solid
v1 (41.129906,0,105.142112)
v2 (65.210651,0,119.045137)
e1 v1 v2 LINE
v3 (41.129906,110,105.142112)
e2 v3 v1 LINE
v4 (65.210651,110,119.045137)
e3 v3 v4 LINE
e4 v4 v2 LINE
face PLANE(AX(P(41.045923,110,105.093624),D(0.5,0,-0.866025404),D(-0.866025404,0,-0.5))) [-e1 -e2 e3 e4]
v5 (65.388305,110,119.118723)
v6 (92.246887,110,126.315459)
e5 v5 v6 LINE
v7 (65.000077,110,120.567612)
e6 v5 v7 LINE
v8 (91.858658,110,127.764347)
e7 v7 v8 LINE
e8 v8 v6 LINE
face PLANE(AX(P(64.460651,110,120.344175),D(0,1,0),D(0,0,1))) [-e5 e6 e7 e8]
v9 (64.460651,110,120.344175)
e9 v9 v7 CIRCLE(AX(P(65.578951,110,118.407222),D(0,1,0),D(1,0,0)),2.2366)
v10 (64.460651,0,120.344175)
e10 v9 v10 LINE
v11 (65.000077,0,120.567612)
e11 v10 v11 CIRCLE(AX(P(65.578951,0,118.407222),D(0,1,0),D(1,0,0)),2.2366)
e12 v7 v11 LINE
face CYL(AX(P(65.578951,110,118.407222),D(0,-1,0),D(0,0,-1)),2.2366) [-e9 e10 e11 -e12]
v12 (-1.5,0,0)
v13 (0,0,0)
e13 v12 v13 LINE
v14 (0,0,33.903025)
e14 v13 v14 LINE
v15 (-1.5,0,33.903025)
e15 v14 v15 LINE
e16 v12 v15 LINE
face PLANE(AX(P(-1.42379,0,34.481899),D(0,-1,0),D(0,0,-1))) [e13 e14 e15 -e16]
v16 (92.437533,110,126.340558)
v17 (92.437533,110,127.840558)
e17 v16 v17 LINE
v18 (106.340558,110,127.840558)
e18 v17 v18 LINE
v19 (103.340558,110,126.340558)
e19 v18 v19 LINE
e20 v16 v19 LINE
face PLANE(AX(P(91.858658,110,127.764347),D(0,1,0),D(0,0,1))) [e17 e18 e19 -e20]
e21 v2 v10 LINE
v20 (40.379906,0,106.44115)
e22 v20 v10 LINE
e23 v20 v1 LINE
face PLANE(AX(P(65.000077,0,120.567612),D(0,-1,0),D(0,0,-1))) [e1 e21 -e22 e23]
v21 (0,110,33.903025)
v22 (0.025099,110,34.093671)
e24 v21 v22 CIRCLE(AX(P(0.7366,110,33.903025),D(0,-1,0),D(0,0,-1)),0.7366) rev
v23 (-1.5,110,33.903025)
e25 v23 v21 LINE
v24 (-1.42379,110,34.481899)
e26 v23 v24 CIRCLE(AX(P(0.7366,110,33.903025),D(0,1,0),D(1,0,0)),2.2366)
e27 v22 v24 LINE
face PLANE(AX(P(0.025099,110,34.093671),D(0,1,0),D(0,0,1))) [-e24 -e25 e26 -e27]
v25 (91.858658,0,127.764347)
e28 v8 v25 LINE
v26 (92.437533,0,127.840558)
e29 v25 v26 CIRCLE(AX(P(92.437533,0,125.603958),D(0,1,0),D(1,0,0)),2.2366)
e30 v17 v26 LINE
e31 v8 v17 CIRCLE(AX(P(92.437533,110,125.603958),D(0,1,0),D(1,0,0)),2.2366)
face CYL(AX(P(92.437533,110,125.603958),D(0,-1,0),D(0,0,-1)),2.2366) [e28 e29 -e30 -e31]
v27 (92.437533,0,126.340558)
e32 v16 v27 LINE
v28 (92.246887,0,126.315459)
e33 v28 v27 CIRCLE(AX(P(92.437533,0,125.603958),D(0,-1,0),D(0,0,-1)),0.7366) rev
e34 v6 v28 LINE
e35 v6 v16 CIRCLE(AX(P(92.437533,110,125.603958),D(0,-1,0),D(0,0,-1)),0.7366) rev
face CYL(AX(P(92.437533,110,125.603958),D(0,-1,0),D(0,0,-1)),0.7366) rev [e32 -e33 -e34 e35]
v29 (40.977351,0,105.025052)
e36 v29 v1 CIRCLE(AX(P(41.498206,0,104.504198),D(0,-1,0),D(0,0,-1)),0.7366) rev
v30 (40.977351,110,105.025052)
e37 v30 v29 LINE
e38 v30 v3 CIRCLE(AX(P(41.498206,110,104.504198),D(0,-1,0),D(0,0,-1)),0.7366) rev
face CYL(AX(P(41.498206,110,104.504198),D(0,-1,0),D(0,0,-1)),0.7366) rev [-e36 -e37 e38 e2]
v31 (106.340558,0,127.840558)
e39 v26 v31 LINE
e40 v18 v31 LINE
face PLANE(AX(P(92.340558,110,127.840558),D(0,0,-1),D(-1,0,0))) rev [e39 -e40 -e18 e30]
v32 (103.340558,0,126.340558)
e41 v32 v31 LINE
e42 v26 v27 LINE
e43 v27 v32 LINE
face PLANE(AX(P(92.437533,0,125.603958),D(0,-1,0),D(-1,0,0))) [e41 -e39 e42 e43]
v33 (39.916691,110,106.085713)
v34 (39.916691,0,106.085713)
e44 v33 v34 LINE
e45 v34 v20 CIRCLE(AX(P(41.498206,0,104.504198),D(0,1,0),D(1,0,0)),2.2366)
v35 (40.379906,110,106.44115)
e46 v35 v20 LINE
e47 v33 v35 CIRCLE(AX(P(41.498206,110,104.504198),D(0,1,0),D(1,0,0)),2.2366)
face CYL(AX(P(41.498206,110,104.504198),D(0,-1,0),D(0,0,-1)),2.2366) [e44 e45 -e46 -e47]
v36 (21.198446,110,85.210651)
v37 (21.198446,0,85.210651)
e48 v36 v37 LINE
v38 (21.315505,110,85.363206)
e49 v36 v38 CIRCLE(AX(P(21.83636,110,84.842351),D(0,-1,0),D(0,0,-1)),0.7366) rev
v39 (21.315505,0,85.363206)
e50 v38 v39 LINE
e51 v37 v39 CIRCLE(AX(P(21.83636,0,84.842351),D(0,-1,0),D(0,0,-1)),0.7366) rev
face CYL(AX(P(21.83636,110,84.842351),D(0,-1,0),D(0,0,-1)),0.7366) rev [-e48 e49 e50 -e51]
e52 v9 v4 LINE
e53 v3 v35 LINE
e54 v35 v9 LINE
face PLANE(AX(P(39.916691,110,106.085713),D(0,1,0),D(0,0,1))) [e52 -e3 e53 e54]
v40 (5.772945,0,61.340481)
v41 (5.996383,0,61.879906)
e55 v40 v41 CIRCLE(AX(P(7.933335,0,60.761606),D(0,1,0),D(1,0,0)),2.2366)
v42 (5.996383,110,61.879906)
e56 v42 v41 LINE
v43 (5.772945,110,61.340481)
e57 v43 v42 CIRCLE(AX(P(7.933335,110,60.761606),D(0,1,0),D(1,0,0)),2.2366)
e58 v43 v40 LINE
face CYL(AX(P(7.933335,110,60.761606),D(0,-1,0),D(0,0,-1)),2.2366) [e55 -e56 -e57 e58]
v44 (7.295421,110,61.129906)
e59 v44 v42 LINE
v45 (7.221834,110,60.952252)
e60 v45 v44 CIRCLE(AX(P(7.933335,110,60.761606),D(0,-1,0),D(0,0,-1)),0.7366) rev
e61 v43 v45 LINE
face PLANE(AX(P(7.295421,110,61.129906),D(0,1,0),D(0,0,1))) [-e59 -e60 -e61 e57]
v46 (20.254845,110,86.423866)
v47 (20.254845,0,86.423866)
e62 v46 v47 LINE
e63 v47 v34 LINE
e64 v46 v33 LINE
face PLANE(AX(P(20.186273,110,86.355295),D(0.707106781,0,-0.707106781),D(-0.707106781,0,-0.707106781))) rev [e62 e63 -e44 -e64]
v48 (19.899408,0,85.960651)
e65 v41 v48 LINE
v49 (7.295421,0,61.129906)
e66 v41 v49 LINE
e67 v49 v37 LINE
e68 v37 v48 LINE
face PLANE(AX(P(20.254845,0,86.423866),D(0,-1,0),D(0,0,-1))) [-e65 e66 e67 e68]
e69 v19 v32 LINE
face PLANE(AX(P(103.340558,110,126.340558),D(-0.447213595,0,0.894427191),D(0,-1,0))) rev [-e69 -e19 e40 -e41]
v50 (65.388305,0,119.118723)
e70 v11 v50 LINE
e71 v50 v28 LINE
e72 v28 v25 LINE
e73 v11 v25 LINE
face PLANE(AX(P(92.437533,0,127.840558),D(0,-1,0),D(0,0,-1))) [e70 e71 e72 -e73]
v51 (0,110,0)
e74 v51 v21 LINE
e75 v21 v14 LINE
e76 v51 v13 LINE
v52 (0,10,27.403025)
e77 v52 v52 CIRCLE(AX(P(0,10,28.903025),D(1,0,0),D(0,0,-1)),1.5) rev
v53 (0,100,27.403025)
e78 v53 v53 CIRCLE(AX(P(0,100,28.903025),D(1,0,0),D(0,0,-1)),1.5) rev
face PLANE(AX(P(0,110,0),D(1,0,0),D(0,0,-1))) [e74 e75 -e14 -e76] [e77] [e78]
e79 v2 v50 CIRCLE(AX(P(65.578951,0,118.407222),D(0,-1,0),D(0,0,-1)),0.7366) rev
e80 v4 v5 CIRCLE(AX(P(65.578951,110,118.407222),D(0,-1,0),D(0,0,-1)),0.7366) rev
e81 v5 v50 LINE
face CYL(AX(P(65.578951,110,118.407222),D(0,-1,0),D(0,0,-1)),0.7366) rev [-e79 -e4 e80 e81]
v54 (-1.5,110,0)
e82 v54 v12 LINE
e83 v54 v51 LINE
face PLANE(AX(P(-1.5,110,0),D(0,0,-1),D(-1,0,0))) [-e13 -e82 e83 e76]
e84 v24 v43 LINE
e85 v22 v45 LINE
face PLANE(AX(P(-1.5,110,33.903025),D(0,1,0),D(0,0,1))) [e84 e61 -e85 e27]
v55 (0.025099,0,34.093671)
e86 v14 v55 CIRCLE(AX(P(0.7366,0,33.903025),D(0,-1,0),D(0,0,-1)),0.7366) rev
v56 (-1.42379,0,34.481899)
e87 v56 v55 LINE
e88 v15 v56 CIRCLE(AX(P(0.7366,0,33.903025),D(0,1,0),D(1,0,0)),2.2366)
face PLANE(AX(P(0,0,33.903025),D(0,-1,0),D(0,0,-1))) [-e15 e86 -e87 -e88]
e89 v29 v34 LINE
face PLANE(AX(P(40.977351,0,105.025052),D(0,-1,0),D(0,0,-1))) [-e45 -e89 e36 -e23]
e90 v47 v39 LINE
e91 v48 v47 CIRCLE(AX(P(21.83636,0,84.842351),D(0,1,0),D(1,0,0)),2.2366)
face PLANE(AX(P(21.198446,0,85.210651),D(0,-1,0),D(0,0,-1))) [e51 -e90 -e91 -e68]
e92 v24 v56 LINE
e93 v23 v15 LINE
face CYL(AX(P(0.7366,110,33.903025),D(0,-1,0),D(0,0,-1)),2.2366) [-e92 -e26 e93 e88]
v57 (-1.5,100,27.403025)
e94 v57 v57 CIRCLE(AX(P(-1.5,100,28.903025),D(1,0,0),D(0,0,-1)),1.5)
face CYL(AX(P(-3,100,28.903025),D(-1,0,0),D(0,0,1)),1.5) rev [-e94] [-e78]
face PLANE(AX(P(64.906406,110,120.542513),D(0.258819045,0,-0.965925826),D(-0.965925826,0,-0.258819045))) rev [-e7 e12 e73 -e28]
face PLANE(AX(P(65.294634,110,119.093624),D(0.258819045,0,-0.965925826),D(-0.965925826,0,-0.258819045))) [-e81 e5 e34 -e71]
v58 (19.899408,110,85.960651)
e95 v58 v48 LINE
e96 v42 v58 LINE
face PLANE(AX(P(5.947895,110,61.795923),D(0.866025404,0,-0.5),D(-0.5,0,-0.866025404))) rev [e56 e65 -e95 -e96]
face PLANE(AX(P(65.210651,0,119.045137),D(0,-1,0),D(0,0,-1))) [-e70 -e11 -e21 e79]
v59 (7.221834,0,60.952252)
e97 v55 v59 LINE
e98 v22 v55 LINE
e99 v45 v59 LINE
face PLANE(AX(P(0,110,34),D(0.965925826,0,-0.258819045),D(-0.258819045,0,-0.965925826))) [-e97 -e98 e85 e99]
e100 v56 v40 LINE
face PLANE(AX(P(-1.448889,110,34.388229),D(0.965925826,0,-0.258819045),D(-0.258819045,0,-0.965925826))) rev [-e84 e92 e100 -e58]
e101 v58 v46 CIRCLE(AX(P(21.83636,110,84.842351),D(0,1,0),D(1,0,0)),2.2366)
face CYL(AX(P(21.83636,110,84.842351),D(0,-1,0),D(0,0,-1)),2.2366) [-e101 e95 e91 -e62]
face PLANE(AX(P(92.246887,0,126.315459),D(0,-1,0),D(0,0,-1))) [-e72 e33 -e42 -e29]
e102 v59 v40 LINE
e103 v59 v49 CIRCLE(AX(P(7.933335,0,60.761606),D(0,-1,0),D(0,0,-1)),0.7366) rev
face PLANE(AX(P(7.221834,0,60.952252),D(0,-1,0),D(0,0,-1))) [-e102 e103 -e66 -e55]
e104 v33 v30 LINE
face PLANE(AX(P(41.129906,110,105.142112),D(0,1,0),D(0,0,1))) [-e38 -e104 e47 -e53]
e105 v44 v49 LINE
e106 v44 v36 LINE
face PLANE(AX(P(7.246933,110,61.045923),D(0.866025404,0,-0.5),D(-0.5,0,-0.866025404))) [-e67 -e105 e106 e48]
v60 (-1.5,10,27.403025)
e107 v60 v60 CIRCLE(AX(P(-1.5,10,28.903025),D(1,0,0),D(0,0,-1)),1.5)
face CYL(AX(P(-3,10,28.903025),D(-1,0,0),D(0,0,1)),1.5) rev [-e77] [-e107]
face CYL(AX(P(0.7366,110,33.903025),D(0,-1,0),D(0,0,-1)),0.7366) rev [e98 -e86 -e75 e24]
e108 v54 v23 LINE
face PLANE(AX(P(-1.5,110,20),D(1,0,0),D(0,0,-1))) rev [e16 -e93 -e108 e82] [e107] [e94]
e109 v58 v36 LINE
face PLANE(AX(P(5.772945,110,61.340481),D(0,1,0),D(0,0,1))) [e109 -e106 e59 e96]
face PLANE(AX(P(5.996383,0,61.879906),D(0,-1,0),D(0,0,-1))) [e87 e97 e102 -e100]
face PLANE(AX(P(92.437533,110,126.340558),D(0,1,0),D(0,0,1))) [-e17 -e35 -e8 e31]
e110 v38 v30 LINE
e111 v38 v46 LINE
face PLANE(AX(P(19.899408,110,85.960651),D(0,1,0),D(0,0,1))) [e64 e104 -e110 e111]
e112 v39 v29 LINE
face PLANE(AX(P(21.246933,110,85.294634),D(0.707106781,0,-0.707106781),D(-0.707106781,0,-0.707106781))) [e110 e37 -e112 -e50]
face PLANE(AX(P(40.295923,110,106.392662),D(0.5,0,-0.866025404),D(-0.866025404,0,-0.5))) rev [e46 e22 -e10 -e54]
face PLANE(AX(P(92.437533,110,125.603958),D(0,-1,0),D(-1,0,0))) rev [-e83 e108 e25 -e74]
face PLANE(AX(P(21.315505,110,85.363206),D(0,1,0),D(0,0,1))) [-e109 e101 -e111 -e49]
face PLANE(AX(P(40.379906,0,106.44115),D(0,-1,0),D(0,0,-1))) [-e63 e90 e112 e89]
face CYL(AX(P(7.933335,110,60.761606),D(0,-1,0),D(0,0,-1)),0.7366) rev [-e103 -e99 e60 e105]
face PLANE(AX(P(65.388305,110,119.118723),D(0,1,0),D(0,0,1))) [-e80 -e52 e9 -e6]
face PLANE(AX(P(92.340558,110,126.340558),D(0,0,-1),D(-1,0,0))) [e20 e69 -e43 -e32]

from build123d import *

# Parameters (mm, degrees)
BASE_FLANGE1_DEPTH          = 110
CHAMFER1_SIZE2              = 3
CHAMFER1_SIZE               = 1.5
F_3_0MM_PRESS_DOWEL_HOLE1_D = 3


# Sheet-metal steps are written as plain solids
with BuildPart() as part:
    # Sketch1 → Base-Flange1 (new body)
    with BuildSketch(Plane(origin=(0, 0, 0), x_dir=(1, 0, 0), z_dir=(0, 1, 0))):
        with BuildLine():
            Line((0, 0), (0, -20))
            Line((0, -20), (0, -33.90302477))
            ThreePointArc((0, -33.90302477), (0.006301715, -33.999170363), (0.025099036, -34.093670879))
            Line((0.025099036, -34.093670879), (7.221834227, -60.952252257))
            ThreePointArc((7.221834227, -60.952252257), (7.252805527, -61.043490765), (7.295420878, -61.129906149))
            Line((7.295420878, -61.129906149), (21.198445648, -85.21065143))
            ThreePointArc((21.198445648, -85.21065143), (21.25197589, -85.290765098), (21.315505105, -85.363206285))
            Line((21.315505105, -85.363206285), (40.977351294, -105.025052473))
            ThreePointArc((40.977351294, -105.025052473), (41.04979248, -105.088581688), (41.129906149, -105.14211193))
            Line((41.129906149, -105.14211193), (65.21065143, -119.0451367))
            ThreePointArc((65.21065143, -119.0451367), (65.297066813, -119.087752052), (65.388305321, -119.118723352))
            Line((65.388305321, -119.118723352), (92.246886699, -126.315458542))
            ThreePointArc((92.246886699, -126.315458542), (92.341387215, -126.334255863), (92.437532808, -126.340557578))
            Line((92.437532808, -126.340557578), (106.340557578, -126.340557578))
            Line((106.340557578, -126.340557578), (106.340557578, -127.840557578))
            Line((106.340557578, -127.840557578), (92.437532808, -127.840557578))
            ThreePointArc((92.437532808, -127.840557578), (92.145597926, -127.821423155), (91.858658132, -127.764347281))
            Line((91.858658132, -127.764347281), (65.000076753, -120.567612091))
            ThreePointArc((65.000076753, -120.567612091), (64.723041665, -120.47357135), (64.46065143, -120.344174806))
            Line((64.46065143, -120.344174806), (40.379906149, -106.441150036))
            ThreePointArc((40.379906148, -106.441150036), (40.136650336, -106.278611699), (39.916691122, -106.085712644))
            Line((39.916691122, -106.085712645), (20.254844934, -86.423866456))
            ThreePointArc((20.254844934, -86.423866456), (20.06194588, -86.203907242), (19.899407542, -85.96065143))
            Line((19.899407542, -85.96065143), (5.996382772, -61.879906149))
            ThreePointArc((5.996382772, -61.879906149), (5.866986228, -61.617515913), (5.772945487, -61.340480825))
            Line((5.772945487, -61.340480825), (-1.423789703, -34.481899447))
            ThreePointArc((-1.423789703, -34.481899447), (-1.480865577, -34.194959652), (-1.5, -33.90302477))
            Line((-1.5, -33.90302477), (-1.5, -20))
            Line((-1.5, -20), (-1.5, 0))
            Line((-1.5, 0), (0, 0))
        make_face()
    extrude(amount=BASE_FLANGE1_DEPTH)

    # Chamfer1
    chamfer1_edges = [part.edges().sort_by_distance(p)[0] for p in [
        (106.340557578, 55, 126.340557578),
    ]]
    chamfer1_side = [part.faces().sort_by_distance(p)[0] for p in [
        (106.340557578, 55, 126.370557578),
    ]]
    chamfer(chamfer1_edges, length=CHAMFER1_SIZE - 0.0001, length2=CHAMFER1_SIZE2 - 0.0001, reference=chamfer1_side[0])  # a hair under: the kernel refuses the full size

    # Ø3.0mm Press Dowel Hole1 (through all)
    with Locations(Plane(origin=(-3, -55.405236378, -125.638352017), x_dir=(0, 0, 1), z_dir=(-1, 0, 0))):
        with Locations((154.541376787, 155.405236378), (154.541376787, 65.405236378)):
            Hole(F_3_0MM_PRESS_DOWEL_HOLE1_D / 2)


solid = part.part
